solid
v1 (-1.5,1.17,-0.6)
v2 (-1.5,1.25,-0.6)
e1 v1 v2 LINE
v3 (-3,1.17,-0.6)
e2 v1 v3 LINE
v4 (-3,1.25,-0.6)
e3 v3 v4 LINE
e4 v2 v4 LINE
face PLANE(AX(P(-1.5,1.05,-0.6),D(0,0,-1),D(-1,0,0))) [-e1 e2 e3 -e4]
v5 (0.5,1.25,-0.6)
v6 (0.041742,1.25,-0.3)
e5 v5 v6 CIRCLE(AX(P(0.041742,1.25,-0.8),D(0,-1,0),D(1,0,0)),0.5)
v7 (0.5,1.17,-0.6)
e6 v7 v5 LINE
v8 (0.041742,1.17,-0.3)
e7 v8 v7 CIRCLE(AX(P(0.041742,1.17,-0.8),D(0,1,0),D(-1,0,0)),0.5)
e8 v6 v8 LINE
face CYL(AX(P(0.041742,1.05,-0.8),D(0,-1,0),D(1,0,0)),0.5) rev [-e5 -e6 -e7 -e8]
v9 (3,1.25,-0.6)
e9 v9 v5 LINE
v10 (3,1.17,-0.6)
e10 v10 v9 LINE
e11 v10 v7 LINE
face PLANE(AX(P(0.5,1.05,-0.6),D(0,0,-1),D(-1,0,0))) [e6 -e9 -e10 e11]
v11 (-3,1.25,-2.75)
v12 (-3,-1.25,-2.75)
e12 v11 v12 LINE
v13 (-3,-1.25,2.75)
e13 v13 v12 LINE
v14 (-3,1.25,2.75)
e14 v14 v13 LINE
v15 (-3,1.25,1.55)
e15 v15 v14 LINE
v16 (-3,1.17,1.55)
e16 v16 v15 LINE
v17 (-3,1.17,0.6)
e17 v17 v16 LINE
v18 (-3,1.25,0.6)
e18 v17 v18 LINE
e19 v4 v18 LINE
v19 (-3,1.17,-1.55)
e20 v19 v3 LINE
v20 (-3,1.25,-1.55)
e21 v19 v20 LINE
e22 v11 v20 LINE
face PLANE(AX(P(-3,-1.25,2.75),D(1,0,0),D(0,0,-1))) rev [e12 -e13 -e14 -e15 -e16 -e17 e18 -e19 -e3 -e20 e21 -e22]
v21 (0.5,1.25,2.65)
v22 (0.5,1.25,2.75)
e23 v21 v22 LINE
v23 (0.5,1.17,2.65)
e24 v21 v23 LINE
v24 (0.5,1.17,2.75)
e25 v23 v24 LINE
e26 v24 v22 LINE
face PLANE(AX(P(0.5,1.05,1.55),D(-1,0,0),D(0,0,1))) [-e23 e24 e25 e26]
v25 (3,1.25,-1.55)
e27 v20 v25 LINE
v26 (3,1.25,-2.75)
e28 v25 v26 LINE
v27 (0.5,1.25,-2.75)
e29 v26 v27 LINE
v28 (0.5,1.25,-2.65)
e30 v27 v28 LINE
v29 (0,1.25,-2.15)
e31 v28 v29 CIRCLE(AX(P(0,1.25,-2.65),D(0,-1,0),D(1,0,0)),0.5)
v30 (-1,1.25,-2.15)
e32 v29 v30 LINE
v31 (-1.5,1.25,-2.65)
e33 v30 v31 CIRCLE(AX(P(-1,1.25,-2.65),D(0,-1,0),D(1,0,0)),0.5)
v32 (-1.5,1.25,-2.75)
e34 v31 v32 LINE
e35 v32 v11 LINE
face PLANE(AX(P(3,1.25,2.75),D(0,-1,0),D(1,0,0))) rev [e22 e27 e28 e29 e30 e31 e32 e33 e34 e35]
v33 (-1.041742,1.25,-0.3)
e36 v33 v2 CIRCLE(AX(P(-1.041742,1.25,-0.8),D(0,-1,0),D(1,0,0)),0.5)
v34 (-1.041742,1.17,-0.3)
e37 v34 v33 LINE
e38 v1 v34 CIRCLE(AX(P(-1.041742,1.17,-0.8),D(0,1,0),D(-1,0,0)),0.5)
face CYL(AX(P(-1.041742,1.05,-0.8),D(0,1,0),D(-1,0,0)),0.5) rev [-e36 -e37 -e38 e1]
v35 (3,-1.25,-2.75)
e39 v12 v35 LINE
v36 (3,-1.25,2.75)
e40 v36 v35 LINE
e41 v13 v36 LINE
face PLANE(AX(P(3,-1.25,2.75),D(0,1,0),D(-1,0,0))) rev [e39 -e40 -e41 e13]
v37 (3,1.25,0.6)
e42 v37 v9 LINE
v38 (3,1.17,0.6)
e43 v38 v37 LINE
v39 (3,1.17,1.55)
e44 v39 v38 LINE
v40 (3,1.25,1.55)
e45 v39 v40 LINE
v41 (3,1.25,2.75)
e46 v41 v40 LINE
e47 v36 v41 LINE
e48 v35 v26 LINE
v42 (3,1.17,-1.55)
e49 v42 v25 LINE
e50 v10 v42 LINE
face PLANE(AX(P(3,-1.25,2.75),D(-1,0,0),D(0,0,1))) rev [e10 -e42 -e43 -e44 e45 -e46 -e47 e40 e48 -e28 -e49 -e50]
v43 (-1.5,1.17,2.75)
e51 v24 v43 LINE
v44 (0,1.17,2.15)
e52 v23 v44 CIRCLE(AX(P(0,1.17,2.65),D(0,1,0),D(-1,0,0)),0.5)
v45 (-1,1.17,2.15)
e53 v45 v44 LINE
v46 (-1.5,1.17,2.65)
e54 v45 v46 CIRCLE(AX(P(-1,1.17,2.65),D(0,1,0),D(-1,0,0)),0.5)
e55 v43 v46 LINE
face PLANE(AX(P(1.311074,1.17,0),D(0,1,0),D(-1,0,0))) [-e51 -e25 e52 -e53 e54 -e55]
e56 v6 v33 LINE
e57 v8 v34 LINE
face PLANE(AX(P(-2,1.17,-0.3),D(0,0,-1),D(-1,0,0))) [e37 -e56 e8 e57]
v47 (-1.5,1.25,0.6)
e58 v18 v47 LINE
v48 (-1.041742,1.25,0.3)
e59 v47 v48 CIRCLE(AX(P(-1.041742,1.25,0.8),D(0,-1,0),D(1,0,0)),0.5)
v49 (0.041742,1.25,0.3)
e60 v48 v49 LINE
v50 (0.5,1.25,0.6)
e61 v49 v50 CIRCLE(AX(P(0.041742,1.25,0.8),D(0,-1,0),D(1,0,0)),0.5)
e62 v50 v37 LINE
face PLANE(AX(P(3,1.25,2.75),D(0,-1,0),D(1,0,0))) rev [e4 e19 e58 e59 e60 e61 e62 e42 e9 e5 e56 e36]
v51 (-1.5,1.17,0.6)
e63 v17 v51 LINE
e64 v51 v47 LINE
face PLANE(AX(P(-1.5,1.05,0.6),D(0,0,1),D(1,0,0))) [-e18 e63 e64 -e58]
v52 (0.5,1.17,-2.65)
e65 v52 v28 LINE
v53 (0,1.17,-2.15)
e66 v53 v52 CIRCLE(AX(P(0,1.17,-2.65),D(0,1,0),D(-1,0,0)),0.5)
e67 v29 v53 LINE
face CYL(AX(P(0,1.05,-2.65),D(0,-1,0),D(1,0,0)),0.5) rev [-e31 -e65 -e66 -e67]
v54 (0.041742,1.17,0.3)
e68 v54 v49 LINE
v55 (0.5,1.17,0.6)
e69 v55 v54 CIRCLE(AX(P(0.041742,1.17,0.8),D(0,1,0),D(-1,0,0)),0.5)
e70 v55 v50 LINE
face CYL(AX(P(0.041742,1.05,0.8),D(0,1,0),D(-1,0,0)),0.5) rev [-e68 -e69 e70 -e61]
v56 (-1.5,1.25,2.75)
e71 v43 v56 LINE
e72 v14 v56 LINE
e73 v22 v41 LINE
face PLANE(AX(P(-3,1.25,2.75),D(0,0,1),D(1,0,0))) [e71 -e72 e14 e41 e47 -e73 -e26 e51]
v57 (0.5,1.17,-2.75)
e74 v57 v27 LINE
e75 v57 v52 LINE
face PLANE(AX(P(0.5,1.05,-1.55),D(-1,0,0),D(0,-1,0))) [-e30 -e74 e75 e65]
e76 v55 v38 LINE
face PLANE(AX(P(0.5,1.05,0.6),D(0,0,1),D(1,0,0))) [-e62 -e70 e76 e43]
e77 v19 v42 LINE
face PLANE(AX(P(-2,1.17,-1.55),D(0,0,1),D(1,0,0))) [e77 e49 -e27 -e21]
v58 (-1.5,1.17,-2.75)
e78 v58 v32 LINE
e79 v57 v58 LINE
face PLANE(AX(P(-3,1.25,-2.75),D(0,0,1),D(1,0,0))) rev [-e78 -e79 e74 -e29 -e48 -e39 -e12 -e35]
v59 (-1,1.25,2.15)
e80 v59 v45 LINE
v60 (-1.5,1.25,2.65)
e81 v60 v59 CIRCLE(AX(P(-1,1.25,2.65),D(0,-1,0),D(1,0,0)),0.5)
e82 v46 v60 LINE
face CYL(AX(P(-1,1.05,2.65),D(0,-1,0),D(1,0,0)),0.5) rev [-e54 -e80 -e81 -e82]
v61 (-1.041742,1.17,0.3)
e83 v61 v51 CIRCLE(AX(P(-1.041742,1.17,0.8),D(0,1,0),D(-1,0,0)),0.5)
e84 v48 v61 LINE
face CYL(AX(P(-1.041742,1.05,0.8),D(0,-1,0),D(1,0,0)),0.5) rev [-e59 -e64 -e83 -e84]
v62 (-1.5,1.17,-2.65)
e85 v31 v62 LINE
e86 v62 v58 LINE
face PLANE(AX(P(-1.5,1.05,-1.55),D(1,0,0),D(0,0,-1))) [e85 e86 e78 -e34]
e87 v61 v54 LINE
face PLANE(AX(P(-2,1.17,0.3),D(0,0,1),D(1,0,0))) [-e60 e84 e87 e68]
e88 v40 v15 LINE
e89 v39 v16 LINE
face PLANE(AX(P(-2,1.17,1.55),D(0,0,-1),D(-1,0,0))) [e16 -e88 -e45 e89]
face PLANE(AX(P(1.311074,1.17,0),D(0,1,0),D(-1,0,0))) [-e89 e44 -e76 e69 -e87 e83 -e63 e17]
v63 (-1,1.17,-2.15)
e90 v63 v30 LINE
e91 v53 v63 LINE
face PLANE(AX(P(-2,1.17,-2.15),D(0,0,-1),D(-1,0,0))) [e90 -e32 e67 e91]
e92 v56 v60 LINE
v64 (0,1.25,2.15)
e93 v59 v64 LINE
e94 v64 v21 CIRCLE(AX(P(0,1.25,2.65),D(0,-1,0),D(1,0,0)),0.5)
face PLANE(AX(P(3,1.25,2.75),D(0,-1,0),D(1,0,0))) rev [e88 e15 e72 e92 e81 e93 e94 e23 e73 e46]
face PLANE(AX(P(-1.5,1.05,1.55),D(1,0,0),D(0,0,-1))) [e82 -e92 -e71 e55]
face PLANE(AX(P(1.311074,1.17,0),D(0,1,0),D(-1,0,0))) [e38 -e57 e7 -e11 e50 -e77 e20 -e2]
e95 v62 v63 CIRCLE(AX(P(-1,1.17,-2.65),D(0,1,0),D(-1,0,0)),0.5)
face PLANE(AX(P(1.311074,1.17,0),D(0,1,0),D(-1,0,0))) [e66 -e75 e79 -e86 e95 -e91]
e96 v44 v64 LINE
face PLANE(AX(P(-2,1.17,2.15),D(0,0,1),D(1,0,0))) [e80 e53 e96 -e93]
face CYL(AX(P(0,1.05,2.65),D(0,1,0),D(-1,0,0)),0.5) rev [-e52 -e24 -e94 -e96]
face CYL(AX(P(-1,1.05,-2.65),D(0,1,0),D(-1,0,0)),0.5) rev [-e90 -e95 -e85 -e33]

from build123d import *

# Parameters (mm, degrees)
SKETCH1_W           = 6
SKETCH1_H           = 2.5
BOSS_EXTRUDE1_DEPTH = 2.75
SKETCH3_OUTSIDE_W   = 9.702
SKETCH3_OUTSIDE_H   = 9.202
SKETCH3_OUTSIDE_W_2 = 4
SKETCH3_OUTSIDE_H_2 = 0.6
CUT_EXTRUDE1_DEPTH  = 0.08
SKETCH7_W           = 1.5
SKETCH7_H           = 1.2
SKETCH7_W_2         = 2.5
BOSS_EXTRUDE3_DEPTH = 0.2
FILLET2_R           = 0.5


with BuildPart() as part:
    # Sketch1 → Boss-Extrude1 (new, symmetric)
    with BuildSketch(Plane.XY):
        Rectangle(SKETCH1_W, SKETCH1_H)
    extrude(amount=BOSS_EXTRUDE1_DEPTH, both=True)

    # Sketch3 outside → Cut-Extrude1 (cut)
    with BuildSketch(Plane(origin=(0, 1.25, 0), x_dir=(1, 0, 0), z_dir=(0, 1, 0))):
        Rectangle(SKETCH3_OUTSIDE_W, SKETCH3_OUTSIDE_H)
        with Locations((0, 1.85)):
            Rectangle(SKETCH3_OUTSIDE_W_2, SKETCH3_OUTSIDE_H_2, mode=Mode.SUBTRACT)
        with Locations((0, -1.85)):
            Rectangle(SKETCH3_OUTSIDE_W_2, SKETCH3_OUTSIDE_H_2, mode=Mode.SUBTRACT)
        Rectangle(SKETCH3_OUTSIDE_W_2, SKETCH3_OUTSIDE_H_2, mode=Mode.SUBTRACT)
    extrude(amount=-CUT_EXTRUDE1_DEPTH, mode=Mode.SUBTRACT)

    # Sketch7 → Boss-Extrude3 (add)
    with BuildSketch(Plane(origin=(0, 1.25, 0), x_dir=(1, 0, 0), z_dir=(0, 1, 0))):
        with Locations((-2.25, 2.15)):
            Rectangle(SKETCH7_W, SKETCH7_H)
        with Locations((-2.25, -2.15)):
            Rectangle(SKETCH7_W, SKETCH7_H)
        with Locations((1.75, 2.15)):
            Rectangle(SKETCH7_W_2, SKETCH7_H)
        with Locations((1.75, -2.15)):
            Rectangle(SKETCH7_W_2, SKETCH7_H)
        with Locations((-2.25, 0)):
            Rectangle(SKETCH7_W, SKETCH7_H)
        with Locations((1.75, 0)):
            Rectangle(SKETCH7_W_2, SKETCH7_H)
    extrude(amount=-BOSS_EXTRUDE3_DEPTH)

    # Fillet2
    # the kernel refuses this fillet: 0.5 mm, written as the material it adds along each edge
    with BuildSketch(Plane(origin=(0.5, 1.25, -2.15), x_dir=(-1, 0, 0), z_dir=(0, -1, 0)), Plane(origin=(0.5, -0.08, 2.15), x_dir=(-1, 0, 0), z_dir=(0, 1, 0)), Plane(origin=(-1.5, 1.25, -2.15), x_dir=(0, 0, -1), z_dir=(0, -1, 0)), Plane(origin=(-1.5, -0.08, 2.15), x_dir=(0, 0, 1), z_dir=(0, 1, 0))) as fillet2_piece_1:
        with BuildLine():
            CenterArc((FILLET2_R, FILLET2_R), FILLET2_R, 180, 90)
            Line((0, FILLET2_R), (-FILLET2_R * 0.02, FILLET2_R))
            Line((-FILLET2_R * 0.02, FILLET2_R), (-FILLET2_R * 0.02, -FILLET2_R * 0.02))
            Line((-FILLET2_R * 0.02, -FILLET2_R * 0.02), (FILLET2_R, -FILLET2_R * 0.02))
            Line((FILLET2_R, -FILLET2_R * 0.02), (FILLET2_R, 0))
        make_face()
    extrude(amount=1.33)
    with BuildSketch(Plane(origin=(-1.5, 0.024356076, -0.3), x_dir=(1, 0, 0), z_dir=(0, 1, 0)), Plane(origin=(0.5, 0.024356076, 0.3), x_dir=(-1, 0, 0), z_dir=(0, 1, 0))) as fillet2_piece_2:
        with BuildLine():
            CenterArc((0.458257569, 0.5), FILLET2_R, 203.578178478, 66.421821522)
            Line((0, 0.3), (-0.009165151, 0.296))
            ThreePointArc((-0.009165151, 0.296), (-0.01, 0.15), (-0.01, 0))
            Line((-0.01, 0), (0, -0.01))
            Line((0, -0.01), (0.458257569, -0.01))
            Line((0.458257569, -0.01), (0.458257569, 0))
        make_face()
    extrude(amount=1.225643924)
    with BuildSketch(Plane(origin=(-1.5, 1.25, 0.3), x_dir=(0, 0, 1), z_dir=(0, -1, 0)), Plane(origin=(0.5, 1.25, -0.3), x_dir=(0, 0, -1), z_dir=(0, -1, 0))) as fillet2_piece_3:
        with BuildLine():
            CenterArc((0.5, -0.458257569), FILLET2_R, 113.578178478, 66.421821522)
            Line((0, -0.458257569), (-0.01, -0.458257569))
            Line((-0.01, -0.458257569), (-0.01, 0))
            Line((-0.01, 0), (0, 0.01))
            ThreePointArc((0, 0.01), (0.15, 0.01), (0.296, 0.009165151))
            Line((0.296, 0.009165151), (0.3, 0))
        make_face()
    extrude(amount=1.225643924)


solid = part.part
